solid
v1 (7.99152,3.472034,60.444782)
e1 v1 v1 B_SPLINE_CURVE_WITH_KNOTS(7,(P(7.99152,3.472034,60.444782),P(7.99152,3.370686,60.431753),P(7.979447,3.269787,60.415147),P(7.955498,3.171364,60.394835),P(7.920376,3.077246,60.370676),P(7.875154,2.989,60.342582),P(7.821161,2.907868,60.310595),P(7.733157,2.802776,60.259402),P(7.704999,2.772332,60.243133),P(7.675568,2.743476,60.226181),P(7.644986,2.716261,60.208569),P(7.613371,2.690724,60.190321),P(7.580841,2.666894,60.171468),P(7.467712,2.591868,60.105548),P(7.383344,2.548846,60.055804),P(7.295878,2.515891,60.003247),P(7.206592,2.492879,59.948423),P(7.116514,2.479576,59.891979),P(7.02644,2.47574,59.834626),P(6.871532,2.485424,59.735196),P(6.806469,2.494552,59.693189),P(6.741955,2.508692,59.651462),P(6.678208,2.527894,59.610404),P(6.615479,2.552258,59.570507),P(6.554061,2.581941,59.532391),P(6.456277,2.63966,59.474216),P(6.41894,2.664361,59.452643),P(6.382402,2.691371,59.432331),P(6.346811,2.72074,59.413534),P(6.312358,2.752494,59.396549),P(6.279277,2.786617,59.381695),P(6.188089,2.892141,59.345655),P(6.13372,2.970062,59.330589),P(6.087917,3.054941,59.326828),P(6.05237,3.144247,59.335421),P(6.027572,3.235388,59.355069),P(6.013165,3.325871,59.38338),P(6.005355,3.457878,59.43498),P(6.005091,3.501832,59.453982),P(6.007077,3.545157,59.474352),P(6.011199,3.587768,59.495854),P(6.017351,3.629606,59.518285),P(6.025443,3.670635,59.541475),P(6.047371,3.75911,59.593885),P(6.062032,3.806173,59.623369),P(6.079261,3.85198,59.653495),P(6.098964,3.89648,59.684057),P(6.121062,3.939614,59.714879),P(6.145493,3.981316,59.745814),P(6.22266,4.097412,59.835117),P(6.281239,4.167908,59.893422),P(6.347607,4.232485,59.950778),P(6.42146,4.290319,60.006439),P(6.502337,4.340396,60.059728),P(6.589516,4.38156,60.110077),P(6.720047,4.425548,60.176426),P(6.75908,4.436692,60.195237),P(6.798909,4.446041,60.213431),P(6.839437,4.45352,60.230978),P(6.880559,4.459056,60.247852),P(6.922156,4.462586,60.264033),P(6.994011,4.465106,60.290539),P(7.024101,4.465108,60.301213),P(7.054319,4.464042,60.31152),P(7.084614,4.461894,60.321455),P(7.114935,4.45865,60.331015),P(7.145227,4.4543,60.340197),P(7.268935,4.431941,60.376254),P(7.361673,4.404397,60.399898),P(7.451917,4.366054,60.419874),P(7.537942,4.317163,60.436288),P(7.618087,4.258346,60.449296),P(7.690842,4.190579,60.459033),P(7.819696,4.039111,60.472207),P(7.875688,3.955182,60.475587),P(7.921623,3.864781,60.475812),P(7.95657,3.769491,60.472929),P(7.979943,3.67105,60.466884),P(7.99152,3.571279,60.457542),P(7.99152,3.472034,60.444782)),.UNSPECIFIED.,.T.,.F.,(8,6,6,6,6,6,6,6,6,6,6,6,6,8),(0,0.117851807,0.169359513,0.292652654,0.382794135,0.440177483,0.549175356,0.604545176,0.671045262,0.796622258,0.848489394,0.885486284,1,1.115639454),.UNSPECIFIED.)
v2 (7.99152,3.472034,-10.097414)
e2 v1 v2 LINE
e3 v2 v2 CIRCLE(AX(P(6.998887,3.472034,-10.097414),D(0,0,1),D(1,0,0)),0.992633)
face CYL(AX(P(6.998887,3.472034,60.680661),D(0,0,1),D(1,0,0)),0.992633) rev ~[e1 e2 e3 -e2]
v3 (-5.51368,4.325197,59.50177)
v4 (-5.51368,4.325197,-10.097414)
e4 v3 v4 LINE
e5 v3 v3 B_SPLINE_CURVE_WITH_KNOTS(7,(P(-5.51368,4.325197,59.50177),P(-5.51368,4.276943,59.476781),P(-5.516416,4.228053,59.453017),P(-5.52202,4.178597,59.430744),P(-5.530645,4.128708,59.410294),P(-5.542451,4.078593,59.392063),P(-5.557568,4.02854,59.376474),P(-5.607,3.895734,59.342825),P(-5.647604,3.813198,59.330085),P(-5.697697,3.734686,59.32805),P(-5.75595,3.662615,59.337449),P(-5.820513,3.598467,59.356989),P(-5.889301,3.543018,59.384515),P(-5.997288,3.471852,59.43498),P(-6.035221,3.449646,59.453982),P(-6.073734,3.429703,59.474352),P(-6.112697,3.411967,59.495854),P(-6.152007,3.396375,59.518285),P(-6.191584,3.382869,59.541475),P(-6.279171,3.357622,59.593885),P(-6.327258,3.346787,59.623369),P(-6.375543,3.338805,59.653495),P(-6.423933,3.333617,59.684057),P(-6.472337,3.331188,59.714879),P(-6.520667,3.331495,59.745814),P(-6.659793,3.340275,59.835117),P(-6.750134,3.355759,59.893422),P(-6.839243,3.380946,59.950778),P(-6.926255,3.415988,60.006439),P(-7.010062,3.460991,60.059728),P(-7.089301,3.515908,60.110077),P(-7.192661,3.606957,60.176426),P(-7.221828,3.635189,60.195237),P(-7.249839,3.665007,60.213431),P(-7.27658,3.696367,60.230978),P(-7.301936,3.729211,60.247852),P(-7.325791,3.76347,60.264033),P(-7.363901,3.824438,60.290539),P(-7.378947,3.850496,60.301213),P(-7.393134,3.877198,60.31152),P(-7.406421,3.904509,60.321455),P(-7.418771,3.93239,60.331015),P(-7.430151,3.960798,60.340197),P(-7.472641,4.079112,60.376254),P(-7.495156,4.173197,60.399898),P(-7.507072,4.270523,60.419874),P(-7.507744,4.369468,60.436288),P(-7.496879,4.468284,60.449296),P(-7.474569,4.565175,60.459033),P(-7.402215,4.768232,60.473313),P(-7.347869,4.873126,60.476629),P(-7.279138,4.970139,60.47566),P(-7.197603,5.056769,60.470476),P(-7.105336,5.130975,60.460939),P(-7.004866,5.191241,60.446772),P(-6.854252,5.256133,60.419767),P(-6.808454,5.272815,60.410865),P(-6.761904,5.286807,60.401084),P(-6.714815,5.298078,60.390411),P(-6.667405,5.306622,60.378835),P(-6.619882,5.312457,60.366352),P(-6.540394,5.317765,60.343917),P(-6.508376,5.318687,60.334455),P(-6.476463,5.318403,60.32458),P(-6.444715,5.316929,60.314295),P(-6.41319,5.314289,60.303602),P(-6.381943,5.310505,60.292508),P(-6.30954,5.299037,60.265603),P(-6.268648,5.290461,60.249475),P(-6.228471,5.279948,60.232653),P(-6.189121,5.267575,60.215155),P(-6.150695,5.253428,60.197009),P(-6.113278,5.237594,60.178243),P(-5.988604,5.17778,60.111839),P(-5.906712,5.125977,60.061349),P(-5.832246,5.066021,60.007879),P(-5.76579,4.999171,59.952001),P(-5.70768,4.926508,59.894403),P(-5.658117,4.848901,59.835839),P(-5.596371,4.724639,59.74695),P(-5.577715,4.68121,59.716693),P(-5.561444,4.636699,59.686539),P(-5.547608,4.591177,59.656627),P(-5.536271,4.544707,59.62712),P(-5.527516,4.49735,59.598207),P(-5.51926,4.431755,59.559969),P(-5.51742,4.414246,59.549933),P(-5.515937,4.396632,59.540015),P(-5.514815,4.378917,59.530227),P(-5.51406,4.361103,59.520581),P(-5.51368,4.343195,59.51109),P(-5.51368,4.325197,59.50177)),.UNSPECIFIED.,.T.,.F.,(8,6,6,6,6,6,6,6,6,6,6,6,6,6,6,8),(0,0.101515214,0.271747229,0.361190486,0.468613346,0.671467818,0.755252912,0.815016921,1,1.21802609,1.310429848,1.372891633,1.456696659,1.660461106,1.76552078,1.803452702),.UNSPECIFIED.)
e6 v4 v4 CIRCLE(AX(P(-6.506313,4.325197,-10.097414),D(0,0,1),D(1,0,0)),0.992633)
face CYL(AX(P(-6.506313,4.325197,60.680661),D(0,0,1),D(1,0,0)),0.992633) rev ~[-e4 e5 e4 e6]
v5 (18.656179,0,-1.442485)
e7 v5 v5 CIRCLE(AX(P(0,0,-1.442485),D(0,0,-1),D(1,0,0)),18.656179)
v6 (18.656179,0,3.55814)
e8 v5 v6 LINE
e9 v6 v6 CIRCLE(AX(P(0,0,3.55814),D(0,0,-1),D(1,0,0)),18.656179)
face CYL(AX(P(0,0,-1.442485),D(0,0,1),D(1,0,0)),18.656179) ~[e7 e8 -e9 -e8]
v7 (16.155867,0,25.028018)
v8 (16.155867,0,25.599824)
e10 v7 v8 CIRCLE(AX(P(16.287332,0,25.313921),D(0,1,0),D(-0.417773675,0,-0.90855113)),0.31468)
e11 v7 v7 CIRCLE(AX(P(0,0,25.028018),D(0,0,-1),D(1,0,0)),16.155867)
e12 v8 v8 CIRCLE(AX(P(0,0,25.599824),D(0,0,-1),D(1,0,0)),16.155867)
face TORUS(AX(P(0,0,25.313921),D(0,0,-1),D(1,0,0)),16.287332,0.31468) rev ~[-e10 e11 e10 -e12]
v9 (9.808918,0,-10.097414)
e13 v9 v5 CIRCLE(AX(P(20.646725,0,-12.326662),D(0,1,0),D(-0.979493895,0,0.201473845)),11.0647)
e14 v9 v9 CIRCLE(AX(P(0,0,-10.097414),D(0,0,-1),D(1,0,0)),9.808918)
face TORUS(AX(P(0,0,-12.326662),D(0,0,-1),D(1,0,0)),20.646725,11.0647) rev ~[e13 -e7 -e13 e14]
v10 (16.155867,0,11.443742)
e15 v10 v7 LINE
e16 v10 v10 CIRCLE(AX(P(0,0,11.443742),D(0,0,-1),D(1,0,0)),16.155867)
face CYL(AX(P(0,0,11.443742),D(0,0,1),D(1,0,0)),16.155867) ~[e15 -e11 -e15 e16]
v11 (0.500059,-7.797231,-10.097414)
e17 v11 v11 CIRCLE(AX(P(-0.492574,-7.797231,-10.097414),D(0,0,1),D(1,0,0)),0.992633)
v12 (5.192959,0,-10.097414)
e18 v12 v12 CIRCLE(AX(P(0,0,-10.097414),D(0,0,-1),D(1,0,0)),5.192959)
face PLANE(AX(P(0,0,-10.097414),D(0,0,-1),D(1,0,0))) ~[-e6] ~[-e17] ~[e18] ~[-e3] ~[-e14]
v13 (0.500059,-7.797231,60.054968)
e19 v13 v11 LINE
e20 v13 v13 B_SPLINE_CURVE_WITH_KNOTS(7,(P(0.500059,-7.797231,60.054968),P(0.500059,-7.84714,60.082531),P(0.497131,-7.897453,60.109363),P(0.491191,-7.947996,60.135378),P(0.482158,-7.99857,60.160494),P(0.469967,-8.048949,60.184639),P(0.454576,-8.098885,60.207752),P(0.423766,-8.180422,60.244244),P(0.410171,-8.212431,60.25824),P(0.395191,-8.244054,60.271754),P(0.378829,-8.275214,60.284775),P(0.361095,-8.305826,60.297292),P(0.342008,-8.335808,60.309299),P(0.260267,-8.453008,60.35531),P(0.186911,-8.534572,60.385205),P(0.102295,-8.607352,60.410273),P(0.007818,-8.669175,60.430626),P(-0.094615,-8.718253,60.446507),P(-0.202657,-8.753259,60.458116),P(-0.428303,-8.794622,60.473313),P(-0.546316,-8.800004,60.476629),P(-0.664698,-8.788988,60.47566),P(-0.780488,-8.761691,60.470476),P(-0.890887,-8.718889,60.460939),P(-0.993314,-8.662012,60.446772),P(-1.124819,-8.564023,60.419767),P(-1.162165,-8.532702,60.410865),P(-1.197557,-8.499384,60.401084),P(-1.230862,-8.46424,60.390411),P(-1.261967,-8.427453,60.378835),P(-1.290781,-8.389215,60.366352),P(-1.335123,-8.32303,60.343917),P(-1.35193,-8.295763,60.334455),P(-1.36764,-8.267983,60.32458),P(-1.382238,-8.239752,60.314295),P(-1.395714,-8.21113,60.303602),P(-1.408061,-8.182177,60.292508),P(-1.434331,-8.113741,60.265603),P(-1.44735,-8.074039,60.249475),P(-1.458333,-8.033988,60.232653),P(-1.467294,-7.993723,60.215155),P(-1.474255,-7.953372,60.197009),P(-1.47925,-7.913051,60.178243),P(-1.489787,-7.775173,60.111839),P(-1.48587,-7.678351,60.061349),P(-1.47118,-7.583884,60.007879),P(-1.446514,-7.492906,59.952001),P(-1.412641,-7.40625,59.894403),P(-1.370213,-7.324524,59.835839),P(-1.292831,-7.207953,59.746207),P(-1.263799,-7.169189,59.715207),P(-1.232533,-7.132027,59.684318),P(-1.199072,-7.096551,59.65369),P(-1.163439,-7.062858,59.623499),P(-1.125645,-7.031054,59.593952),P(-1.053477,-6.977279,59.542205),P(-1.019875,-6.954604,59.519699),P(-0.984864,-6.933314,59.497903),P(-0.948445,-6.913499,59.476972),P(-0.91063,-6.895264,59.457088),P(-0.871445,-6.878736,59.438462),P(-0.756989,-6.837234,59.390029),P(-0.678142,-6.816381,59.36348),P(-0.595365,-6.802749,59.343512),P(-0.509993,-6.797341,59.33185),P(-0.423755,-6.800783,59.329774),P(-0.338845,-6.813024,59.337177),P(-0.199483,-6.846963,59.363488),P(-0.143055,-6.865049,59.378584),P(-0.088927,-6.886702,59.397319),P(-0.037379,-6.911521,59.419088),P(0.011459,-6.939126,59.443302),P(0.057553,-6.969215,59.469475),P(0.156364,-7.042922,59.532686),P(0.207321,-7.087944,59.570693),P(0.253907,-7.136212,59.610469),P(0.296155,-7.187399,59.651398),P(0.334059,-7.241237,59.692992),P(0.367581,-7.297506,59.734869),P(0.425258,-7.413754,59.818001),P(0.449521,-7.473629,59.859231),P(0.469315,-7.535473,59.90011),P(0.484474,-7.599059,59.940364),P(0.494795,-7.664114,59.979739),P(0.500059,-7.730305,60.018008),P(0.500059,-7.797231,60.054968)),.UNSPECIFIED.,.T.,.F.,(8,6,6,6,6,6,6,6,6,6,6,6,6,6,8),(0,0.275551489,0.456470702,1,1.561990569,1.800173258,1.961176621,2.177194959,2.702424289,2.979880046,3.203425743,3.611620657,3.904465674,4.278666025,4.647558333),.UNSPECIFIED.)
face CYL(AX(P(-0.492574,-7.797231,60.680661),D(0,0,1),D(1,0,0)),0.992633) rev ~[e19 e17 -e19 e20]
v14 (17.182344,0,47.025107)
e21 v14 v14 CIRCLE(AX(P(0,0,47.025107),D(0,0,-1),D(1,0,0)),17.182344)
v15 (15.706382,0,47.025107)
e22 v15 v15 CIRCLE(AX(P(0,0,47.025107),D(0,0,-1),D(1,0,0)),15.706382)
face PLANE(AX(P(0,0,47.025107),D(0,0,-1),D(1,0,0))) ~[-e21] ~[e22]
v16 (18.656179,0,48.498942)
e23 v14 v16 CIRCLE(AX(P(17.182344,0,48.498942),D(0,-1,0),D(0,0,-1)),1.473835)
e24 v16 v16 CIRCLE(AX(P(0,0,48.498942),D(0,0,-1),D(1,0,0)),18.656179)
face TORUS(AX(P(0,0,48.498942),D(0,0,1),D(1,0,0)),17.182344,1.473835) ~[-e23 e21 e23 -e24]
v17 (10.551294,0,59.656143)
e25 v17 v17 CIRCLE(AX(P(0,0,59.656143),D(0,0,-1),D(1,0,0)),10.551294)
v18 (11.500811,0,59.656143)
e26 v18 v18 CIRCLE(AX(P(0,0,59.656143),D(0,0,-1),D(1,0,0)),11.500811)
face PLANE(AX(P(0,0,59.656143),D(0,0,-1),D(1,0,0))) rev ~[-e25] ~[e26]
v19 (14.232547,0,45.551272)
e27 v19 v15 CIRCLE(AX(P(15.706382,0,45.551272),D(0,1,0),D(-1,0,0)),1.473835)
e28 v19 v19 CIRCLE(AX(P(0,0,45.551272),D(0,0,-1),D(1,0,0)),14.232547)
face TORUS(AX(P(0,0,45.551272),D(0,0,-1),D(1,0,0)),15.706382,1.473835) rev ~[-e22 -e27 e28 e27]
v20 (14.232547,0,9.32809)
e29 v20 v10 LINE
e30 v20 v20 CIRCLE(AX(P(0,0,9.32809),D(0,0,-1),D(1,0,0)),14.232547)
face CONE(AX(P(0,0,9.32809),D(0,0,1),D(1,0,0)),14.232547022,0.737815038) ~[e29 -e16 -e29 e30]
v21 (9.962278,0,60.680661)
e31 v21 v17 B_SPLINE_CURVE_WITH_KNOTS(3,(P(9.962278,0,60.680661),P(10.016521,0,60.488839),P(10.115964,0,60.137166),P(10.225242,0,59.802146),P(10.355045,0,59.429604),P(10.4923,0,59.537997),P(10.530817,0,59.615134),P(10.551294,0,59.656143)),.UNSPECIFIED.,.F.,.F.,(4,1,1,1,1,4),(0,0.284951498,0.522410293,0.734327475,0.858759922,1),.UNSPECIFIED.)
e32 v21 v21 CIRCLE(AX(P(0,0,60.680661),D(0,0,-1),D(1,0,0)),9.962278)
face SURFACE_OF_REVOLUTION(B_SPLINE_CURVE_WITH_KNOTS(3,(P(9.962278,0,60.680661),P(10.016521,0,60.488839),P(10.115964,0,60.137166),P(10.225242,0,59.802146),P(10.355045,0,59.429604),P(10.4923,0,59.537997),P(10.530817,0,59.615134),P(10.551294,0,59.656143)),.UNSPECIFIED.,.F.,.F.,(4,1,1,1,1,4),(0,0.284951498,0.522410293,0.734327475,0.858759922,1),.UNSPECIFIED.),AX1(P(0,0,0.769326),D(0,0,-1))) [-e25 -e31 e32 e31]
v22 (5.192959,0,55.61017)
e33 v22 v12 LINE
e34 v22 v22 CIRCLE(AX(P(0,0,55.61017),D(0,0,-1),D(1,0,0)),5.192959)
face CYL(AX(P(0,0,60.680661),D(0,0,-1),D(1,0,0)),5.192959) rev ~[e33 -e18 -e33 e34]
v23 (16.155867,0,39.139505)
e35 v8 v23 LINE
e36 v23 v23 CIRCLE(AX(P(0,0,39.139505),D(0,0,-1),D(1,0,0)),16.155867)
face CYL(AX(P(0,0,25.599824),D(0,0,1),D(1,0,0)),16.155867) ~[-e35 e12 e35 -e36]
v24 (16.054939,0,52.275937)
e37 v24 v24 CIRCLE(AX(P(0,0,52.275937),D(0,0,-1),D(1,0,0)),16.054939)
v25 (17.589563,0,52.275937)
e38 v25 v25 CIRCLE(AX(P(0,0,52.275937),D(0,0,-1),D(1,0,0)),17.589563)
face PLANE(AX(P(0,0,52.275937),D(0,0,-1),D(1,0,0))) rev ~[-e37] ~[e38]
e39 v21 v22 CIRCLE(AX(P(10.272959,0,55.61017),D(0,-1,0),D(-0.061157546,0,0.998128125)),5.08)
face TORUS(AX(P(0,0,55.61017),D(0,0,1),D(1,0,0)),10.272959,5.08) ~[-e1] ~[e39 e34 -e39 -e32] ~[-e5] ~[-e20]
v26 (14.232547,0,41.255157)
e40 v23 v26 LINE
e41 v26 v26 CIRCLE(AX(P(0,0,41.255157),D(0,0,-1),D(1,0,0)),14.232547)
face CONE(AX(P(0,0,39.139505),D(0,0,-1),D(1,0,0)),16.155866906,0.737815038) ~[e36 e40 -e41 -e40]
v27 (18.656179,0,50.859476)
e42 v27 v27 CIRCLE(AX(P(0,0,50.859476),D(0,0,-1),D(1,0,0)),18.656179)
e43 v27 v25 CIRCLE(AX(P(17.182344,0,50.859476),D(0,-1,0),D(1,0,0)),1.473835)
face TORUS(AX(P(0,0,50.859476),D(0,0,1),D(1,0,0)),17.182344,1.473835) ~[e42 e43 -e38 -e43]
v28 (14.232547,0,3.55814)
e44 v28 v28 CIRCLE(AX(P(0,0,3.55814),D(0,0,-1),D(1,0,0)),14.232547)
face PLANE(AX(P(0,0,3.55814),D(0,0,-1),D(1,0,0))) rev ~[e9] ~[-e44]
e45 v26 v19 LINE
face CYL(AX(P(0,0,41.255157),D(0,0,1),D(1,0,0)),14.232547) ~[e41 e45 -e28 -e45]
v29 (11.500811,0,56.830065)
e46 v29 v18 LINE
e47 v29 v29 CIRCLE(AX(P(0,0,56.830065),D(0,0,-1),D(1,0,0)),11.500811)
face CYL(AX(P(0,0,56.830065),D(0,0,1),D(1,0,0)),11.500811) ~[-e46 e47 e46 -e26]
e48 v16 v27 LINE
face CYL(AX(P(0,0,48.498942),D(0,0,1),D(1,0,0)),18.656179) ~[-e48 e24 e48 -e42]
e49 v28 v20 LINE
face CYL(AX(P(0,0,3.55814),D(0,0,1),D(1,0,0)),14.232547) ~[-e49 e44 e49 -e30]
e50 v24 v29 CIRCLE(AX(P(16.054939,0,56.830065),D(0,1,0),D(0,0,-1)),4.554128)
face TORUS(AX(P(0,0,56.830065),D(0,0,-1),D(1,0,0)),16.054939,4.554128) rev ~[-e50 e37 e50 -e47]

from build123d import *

# Parameters (mm, degrees)
F2_R     = 0.9926331533
F3_DEPTH = 76.962


# Not quite as in the source:
# - a fillet or chamfer that OpenCascade refuses, or shapes differently, is made with other operations: its cross-section is extruded or revolved along the edge and cut away or added


with BuildPart() as f1:
    # F0 (on Front) → F1 (revolve)
    with BuildSketch(Plane.XZ):
        with BuildLine():
            Line((5.1929587498, 60.6806613505), (5.1929587498, -10.0974142551))
            Line((5.1929587498, -10.0974142551), (9.8089184612, -10.0974142551))
            ThreePointArc((9.8089184612, -10.0974142551), (12.909244256, -4.4172381027), (18.6561793089, -1.4424845576))
            Line((18.6561793089, -1.4424845576), (18.6561793089, 3.5581402481))
            Line((18.6561793089, 3.5581402481), (14.2325470224, 3.5581402481))
            Line((14.2325470224, 3.5581402481), (14.2325470224, 9.3280896544))
            Line((14.2325470224, 9.3280896544), (16.155866906, 11.4437416196))
            Line((16.155866906, 11.4437416196), (16.155866906, 25.0280182809))
            ThreePointArc((16.155866906, 25.0280182809), (15.9726518478, 25.3139212728), (16.155866906, 25.5998242646))
            Line((16.155866906, 25.5998242646), (16.155866906, 39.1395054758))
            Line((16.155866906, 39.1395054758), (14.2325470224, 41.2551574409))
            Line((14.2325470224, 41.2551574409), (14.2325470224, 45.5512719705))
            ThreePointArc((14.2325470224, 45.5512719705), (14.6642232635, 46.5934306062), (15.7063818992, 47.0251068473))
            Line((15.7063818992, 47.0251068473), (17.1823444321, 47.0251068473))
            ThreePointArc((17.1823444321, 47.0251068473), (18.2245030678, 47.4567830884), (18.6561793089, 48.4989417241))
            Line((18.6561793089, 48.4989417241), (18.6561793089, 50.8594763109))
            ThreePointArc((18.6561793089, 50.8594763109), (18.3597063527, 51.7460473189), (17.5895630082, 52.2759374913))
            Line((17.5895630082, 52.2759374913), (16.0549388054, 52.2759374913))
            ThreePointArc((16.0549388054, 52.2759374913), (12.8346842963, 53.6098105832), (11.5008112043, 56.8300650923))
            Line((11.5008112043, 56.8300650923), (11.5008112043, 59.6561431885))
            Line((11.5008112043, 59.6561431885), (10.5512943119, 59.6561431885))
            add(Edge.make_bspline(
                [(9.9622784182, 60.6806613505), (10.0165205284, 60.4888391389), (10.1159642473, 60.1371656141), (10.2252415949, 59.8021463565), (10.3550447499, 59.4296037744), (10.4923000256, 59.5379966019), (10.5308172917, 59.6151343012), (10.5512943119, 59.6561431885)],
                knots=[0, 0, 0, 0, 0.2849514983, 0.5224102931, 0.7343274754, 0.8587599224, 1, 1, 1, 1], degree=3))
            Line((9.9622784182, 60.6806613505), (9.8089184612, 60.6806613505))
            Line((9.8089184612, 60.6806613505), (5.1929587498, 60.6806613505))
        make_face()
    revolve(axis=Axis((0, 0, 0.7693264633), (0, 0, -1)))

    # F2 (on face) → F3 (cut)
    with BuildSketch(Plane.XY.offset(60.6806613505)):
        with Locations((-6.5063127582, 4.3251969566)):
            Circle(F2_R)
        with Locations((6.9988868199, 3.4720336553)):
            Circle(F2_R)
        with Locations((-0.4925740617, -7.7972306119)):
            Circle(F2_R)
    extrude(amount=-F3_DEPTH, mode=Mode.SUBTRACT)

    # F4: fillet of radius 5.08 on 1 edges, made by hand

    # F4_s1 → F4_t2 (revolve, cut)
    with BuildSketch(Plane.XZ):
        with BuildLine():
            ThreePointArc((9.9622784182, 60.6806613505), (6.5726441629, 59.0906980139), (5.1929587498, 55.6101704737))
            Line((5.1929587498, 55.6101704737), (5.1929587498, 60.6806613505))
            Line((5.1929587498, 60.6806613505), (9.9622784182, 60.6806613505))
        make_face()
    revolve(axis=Axis((0, 0, 60.6806613505), (0, 0, -1)), mode=Mode.SUBTRACT)


solid = f1.part
